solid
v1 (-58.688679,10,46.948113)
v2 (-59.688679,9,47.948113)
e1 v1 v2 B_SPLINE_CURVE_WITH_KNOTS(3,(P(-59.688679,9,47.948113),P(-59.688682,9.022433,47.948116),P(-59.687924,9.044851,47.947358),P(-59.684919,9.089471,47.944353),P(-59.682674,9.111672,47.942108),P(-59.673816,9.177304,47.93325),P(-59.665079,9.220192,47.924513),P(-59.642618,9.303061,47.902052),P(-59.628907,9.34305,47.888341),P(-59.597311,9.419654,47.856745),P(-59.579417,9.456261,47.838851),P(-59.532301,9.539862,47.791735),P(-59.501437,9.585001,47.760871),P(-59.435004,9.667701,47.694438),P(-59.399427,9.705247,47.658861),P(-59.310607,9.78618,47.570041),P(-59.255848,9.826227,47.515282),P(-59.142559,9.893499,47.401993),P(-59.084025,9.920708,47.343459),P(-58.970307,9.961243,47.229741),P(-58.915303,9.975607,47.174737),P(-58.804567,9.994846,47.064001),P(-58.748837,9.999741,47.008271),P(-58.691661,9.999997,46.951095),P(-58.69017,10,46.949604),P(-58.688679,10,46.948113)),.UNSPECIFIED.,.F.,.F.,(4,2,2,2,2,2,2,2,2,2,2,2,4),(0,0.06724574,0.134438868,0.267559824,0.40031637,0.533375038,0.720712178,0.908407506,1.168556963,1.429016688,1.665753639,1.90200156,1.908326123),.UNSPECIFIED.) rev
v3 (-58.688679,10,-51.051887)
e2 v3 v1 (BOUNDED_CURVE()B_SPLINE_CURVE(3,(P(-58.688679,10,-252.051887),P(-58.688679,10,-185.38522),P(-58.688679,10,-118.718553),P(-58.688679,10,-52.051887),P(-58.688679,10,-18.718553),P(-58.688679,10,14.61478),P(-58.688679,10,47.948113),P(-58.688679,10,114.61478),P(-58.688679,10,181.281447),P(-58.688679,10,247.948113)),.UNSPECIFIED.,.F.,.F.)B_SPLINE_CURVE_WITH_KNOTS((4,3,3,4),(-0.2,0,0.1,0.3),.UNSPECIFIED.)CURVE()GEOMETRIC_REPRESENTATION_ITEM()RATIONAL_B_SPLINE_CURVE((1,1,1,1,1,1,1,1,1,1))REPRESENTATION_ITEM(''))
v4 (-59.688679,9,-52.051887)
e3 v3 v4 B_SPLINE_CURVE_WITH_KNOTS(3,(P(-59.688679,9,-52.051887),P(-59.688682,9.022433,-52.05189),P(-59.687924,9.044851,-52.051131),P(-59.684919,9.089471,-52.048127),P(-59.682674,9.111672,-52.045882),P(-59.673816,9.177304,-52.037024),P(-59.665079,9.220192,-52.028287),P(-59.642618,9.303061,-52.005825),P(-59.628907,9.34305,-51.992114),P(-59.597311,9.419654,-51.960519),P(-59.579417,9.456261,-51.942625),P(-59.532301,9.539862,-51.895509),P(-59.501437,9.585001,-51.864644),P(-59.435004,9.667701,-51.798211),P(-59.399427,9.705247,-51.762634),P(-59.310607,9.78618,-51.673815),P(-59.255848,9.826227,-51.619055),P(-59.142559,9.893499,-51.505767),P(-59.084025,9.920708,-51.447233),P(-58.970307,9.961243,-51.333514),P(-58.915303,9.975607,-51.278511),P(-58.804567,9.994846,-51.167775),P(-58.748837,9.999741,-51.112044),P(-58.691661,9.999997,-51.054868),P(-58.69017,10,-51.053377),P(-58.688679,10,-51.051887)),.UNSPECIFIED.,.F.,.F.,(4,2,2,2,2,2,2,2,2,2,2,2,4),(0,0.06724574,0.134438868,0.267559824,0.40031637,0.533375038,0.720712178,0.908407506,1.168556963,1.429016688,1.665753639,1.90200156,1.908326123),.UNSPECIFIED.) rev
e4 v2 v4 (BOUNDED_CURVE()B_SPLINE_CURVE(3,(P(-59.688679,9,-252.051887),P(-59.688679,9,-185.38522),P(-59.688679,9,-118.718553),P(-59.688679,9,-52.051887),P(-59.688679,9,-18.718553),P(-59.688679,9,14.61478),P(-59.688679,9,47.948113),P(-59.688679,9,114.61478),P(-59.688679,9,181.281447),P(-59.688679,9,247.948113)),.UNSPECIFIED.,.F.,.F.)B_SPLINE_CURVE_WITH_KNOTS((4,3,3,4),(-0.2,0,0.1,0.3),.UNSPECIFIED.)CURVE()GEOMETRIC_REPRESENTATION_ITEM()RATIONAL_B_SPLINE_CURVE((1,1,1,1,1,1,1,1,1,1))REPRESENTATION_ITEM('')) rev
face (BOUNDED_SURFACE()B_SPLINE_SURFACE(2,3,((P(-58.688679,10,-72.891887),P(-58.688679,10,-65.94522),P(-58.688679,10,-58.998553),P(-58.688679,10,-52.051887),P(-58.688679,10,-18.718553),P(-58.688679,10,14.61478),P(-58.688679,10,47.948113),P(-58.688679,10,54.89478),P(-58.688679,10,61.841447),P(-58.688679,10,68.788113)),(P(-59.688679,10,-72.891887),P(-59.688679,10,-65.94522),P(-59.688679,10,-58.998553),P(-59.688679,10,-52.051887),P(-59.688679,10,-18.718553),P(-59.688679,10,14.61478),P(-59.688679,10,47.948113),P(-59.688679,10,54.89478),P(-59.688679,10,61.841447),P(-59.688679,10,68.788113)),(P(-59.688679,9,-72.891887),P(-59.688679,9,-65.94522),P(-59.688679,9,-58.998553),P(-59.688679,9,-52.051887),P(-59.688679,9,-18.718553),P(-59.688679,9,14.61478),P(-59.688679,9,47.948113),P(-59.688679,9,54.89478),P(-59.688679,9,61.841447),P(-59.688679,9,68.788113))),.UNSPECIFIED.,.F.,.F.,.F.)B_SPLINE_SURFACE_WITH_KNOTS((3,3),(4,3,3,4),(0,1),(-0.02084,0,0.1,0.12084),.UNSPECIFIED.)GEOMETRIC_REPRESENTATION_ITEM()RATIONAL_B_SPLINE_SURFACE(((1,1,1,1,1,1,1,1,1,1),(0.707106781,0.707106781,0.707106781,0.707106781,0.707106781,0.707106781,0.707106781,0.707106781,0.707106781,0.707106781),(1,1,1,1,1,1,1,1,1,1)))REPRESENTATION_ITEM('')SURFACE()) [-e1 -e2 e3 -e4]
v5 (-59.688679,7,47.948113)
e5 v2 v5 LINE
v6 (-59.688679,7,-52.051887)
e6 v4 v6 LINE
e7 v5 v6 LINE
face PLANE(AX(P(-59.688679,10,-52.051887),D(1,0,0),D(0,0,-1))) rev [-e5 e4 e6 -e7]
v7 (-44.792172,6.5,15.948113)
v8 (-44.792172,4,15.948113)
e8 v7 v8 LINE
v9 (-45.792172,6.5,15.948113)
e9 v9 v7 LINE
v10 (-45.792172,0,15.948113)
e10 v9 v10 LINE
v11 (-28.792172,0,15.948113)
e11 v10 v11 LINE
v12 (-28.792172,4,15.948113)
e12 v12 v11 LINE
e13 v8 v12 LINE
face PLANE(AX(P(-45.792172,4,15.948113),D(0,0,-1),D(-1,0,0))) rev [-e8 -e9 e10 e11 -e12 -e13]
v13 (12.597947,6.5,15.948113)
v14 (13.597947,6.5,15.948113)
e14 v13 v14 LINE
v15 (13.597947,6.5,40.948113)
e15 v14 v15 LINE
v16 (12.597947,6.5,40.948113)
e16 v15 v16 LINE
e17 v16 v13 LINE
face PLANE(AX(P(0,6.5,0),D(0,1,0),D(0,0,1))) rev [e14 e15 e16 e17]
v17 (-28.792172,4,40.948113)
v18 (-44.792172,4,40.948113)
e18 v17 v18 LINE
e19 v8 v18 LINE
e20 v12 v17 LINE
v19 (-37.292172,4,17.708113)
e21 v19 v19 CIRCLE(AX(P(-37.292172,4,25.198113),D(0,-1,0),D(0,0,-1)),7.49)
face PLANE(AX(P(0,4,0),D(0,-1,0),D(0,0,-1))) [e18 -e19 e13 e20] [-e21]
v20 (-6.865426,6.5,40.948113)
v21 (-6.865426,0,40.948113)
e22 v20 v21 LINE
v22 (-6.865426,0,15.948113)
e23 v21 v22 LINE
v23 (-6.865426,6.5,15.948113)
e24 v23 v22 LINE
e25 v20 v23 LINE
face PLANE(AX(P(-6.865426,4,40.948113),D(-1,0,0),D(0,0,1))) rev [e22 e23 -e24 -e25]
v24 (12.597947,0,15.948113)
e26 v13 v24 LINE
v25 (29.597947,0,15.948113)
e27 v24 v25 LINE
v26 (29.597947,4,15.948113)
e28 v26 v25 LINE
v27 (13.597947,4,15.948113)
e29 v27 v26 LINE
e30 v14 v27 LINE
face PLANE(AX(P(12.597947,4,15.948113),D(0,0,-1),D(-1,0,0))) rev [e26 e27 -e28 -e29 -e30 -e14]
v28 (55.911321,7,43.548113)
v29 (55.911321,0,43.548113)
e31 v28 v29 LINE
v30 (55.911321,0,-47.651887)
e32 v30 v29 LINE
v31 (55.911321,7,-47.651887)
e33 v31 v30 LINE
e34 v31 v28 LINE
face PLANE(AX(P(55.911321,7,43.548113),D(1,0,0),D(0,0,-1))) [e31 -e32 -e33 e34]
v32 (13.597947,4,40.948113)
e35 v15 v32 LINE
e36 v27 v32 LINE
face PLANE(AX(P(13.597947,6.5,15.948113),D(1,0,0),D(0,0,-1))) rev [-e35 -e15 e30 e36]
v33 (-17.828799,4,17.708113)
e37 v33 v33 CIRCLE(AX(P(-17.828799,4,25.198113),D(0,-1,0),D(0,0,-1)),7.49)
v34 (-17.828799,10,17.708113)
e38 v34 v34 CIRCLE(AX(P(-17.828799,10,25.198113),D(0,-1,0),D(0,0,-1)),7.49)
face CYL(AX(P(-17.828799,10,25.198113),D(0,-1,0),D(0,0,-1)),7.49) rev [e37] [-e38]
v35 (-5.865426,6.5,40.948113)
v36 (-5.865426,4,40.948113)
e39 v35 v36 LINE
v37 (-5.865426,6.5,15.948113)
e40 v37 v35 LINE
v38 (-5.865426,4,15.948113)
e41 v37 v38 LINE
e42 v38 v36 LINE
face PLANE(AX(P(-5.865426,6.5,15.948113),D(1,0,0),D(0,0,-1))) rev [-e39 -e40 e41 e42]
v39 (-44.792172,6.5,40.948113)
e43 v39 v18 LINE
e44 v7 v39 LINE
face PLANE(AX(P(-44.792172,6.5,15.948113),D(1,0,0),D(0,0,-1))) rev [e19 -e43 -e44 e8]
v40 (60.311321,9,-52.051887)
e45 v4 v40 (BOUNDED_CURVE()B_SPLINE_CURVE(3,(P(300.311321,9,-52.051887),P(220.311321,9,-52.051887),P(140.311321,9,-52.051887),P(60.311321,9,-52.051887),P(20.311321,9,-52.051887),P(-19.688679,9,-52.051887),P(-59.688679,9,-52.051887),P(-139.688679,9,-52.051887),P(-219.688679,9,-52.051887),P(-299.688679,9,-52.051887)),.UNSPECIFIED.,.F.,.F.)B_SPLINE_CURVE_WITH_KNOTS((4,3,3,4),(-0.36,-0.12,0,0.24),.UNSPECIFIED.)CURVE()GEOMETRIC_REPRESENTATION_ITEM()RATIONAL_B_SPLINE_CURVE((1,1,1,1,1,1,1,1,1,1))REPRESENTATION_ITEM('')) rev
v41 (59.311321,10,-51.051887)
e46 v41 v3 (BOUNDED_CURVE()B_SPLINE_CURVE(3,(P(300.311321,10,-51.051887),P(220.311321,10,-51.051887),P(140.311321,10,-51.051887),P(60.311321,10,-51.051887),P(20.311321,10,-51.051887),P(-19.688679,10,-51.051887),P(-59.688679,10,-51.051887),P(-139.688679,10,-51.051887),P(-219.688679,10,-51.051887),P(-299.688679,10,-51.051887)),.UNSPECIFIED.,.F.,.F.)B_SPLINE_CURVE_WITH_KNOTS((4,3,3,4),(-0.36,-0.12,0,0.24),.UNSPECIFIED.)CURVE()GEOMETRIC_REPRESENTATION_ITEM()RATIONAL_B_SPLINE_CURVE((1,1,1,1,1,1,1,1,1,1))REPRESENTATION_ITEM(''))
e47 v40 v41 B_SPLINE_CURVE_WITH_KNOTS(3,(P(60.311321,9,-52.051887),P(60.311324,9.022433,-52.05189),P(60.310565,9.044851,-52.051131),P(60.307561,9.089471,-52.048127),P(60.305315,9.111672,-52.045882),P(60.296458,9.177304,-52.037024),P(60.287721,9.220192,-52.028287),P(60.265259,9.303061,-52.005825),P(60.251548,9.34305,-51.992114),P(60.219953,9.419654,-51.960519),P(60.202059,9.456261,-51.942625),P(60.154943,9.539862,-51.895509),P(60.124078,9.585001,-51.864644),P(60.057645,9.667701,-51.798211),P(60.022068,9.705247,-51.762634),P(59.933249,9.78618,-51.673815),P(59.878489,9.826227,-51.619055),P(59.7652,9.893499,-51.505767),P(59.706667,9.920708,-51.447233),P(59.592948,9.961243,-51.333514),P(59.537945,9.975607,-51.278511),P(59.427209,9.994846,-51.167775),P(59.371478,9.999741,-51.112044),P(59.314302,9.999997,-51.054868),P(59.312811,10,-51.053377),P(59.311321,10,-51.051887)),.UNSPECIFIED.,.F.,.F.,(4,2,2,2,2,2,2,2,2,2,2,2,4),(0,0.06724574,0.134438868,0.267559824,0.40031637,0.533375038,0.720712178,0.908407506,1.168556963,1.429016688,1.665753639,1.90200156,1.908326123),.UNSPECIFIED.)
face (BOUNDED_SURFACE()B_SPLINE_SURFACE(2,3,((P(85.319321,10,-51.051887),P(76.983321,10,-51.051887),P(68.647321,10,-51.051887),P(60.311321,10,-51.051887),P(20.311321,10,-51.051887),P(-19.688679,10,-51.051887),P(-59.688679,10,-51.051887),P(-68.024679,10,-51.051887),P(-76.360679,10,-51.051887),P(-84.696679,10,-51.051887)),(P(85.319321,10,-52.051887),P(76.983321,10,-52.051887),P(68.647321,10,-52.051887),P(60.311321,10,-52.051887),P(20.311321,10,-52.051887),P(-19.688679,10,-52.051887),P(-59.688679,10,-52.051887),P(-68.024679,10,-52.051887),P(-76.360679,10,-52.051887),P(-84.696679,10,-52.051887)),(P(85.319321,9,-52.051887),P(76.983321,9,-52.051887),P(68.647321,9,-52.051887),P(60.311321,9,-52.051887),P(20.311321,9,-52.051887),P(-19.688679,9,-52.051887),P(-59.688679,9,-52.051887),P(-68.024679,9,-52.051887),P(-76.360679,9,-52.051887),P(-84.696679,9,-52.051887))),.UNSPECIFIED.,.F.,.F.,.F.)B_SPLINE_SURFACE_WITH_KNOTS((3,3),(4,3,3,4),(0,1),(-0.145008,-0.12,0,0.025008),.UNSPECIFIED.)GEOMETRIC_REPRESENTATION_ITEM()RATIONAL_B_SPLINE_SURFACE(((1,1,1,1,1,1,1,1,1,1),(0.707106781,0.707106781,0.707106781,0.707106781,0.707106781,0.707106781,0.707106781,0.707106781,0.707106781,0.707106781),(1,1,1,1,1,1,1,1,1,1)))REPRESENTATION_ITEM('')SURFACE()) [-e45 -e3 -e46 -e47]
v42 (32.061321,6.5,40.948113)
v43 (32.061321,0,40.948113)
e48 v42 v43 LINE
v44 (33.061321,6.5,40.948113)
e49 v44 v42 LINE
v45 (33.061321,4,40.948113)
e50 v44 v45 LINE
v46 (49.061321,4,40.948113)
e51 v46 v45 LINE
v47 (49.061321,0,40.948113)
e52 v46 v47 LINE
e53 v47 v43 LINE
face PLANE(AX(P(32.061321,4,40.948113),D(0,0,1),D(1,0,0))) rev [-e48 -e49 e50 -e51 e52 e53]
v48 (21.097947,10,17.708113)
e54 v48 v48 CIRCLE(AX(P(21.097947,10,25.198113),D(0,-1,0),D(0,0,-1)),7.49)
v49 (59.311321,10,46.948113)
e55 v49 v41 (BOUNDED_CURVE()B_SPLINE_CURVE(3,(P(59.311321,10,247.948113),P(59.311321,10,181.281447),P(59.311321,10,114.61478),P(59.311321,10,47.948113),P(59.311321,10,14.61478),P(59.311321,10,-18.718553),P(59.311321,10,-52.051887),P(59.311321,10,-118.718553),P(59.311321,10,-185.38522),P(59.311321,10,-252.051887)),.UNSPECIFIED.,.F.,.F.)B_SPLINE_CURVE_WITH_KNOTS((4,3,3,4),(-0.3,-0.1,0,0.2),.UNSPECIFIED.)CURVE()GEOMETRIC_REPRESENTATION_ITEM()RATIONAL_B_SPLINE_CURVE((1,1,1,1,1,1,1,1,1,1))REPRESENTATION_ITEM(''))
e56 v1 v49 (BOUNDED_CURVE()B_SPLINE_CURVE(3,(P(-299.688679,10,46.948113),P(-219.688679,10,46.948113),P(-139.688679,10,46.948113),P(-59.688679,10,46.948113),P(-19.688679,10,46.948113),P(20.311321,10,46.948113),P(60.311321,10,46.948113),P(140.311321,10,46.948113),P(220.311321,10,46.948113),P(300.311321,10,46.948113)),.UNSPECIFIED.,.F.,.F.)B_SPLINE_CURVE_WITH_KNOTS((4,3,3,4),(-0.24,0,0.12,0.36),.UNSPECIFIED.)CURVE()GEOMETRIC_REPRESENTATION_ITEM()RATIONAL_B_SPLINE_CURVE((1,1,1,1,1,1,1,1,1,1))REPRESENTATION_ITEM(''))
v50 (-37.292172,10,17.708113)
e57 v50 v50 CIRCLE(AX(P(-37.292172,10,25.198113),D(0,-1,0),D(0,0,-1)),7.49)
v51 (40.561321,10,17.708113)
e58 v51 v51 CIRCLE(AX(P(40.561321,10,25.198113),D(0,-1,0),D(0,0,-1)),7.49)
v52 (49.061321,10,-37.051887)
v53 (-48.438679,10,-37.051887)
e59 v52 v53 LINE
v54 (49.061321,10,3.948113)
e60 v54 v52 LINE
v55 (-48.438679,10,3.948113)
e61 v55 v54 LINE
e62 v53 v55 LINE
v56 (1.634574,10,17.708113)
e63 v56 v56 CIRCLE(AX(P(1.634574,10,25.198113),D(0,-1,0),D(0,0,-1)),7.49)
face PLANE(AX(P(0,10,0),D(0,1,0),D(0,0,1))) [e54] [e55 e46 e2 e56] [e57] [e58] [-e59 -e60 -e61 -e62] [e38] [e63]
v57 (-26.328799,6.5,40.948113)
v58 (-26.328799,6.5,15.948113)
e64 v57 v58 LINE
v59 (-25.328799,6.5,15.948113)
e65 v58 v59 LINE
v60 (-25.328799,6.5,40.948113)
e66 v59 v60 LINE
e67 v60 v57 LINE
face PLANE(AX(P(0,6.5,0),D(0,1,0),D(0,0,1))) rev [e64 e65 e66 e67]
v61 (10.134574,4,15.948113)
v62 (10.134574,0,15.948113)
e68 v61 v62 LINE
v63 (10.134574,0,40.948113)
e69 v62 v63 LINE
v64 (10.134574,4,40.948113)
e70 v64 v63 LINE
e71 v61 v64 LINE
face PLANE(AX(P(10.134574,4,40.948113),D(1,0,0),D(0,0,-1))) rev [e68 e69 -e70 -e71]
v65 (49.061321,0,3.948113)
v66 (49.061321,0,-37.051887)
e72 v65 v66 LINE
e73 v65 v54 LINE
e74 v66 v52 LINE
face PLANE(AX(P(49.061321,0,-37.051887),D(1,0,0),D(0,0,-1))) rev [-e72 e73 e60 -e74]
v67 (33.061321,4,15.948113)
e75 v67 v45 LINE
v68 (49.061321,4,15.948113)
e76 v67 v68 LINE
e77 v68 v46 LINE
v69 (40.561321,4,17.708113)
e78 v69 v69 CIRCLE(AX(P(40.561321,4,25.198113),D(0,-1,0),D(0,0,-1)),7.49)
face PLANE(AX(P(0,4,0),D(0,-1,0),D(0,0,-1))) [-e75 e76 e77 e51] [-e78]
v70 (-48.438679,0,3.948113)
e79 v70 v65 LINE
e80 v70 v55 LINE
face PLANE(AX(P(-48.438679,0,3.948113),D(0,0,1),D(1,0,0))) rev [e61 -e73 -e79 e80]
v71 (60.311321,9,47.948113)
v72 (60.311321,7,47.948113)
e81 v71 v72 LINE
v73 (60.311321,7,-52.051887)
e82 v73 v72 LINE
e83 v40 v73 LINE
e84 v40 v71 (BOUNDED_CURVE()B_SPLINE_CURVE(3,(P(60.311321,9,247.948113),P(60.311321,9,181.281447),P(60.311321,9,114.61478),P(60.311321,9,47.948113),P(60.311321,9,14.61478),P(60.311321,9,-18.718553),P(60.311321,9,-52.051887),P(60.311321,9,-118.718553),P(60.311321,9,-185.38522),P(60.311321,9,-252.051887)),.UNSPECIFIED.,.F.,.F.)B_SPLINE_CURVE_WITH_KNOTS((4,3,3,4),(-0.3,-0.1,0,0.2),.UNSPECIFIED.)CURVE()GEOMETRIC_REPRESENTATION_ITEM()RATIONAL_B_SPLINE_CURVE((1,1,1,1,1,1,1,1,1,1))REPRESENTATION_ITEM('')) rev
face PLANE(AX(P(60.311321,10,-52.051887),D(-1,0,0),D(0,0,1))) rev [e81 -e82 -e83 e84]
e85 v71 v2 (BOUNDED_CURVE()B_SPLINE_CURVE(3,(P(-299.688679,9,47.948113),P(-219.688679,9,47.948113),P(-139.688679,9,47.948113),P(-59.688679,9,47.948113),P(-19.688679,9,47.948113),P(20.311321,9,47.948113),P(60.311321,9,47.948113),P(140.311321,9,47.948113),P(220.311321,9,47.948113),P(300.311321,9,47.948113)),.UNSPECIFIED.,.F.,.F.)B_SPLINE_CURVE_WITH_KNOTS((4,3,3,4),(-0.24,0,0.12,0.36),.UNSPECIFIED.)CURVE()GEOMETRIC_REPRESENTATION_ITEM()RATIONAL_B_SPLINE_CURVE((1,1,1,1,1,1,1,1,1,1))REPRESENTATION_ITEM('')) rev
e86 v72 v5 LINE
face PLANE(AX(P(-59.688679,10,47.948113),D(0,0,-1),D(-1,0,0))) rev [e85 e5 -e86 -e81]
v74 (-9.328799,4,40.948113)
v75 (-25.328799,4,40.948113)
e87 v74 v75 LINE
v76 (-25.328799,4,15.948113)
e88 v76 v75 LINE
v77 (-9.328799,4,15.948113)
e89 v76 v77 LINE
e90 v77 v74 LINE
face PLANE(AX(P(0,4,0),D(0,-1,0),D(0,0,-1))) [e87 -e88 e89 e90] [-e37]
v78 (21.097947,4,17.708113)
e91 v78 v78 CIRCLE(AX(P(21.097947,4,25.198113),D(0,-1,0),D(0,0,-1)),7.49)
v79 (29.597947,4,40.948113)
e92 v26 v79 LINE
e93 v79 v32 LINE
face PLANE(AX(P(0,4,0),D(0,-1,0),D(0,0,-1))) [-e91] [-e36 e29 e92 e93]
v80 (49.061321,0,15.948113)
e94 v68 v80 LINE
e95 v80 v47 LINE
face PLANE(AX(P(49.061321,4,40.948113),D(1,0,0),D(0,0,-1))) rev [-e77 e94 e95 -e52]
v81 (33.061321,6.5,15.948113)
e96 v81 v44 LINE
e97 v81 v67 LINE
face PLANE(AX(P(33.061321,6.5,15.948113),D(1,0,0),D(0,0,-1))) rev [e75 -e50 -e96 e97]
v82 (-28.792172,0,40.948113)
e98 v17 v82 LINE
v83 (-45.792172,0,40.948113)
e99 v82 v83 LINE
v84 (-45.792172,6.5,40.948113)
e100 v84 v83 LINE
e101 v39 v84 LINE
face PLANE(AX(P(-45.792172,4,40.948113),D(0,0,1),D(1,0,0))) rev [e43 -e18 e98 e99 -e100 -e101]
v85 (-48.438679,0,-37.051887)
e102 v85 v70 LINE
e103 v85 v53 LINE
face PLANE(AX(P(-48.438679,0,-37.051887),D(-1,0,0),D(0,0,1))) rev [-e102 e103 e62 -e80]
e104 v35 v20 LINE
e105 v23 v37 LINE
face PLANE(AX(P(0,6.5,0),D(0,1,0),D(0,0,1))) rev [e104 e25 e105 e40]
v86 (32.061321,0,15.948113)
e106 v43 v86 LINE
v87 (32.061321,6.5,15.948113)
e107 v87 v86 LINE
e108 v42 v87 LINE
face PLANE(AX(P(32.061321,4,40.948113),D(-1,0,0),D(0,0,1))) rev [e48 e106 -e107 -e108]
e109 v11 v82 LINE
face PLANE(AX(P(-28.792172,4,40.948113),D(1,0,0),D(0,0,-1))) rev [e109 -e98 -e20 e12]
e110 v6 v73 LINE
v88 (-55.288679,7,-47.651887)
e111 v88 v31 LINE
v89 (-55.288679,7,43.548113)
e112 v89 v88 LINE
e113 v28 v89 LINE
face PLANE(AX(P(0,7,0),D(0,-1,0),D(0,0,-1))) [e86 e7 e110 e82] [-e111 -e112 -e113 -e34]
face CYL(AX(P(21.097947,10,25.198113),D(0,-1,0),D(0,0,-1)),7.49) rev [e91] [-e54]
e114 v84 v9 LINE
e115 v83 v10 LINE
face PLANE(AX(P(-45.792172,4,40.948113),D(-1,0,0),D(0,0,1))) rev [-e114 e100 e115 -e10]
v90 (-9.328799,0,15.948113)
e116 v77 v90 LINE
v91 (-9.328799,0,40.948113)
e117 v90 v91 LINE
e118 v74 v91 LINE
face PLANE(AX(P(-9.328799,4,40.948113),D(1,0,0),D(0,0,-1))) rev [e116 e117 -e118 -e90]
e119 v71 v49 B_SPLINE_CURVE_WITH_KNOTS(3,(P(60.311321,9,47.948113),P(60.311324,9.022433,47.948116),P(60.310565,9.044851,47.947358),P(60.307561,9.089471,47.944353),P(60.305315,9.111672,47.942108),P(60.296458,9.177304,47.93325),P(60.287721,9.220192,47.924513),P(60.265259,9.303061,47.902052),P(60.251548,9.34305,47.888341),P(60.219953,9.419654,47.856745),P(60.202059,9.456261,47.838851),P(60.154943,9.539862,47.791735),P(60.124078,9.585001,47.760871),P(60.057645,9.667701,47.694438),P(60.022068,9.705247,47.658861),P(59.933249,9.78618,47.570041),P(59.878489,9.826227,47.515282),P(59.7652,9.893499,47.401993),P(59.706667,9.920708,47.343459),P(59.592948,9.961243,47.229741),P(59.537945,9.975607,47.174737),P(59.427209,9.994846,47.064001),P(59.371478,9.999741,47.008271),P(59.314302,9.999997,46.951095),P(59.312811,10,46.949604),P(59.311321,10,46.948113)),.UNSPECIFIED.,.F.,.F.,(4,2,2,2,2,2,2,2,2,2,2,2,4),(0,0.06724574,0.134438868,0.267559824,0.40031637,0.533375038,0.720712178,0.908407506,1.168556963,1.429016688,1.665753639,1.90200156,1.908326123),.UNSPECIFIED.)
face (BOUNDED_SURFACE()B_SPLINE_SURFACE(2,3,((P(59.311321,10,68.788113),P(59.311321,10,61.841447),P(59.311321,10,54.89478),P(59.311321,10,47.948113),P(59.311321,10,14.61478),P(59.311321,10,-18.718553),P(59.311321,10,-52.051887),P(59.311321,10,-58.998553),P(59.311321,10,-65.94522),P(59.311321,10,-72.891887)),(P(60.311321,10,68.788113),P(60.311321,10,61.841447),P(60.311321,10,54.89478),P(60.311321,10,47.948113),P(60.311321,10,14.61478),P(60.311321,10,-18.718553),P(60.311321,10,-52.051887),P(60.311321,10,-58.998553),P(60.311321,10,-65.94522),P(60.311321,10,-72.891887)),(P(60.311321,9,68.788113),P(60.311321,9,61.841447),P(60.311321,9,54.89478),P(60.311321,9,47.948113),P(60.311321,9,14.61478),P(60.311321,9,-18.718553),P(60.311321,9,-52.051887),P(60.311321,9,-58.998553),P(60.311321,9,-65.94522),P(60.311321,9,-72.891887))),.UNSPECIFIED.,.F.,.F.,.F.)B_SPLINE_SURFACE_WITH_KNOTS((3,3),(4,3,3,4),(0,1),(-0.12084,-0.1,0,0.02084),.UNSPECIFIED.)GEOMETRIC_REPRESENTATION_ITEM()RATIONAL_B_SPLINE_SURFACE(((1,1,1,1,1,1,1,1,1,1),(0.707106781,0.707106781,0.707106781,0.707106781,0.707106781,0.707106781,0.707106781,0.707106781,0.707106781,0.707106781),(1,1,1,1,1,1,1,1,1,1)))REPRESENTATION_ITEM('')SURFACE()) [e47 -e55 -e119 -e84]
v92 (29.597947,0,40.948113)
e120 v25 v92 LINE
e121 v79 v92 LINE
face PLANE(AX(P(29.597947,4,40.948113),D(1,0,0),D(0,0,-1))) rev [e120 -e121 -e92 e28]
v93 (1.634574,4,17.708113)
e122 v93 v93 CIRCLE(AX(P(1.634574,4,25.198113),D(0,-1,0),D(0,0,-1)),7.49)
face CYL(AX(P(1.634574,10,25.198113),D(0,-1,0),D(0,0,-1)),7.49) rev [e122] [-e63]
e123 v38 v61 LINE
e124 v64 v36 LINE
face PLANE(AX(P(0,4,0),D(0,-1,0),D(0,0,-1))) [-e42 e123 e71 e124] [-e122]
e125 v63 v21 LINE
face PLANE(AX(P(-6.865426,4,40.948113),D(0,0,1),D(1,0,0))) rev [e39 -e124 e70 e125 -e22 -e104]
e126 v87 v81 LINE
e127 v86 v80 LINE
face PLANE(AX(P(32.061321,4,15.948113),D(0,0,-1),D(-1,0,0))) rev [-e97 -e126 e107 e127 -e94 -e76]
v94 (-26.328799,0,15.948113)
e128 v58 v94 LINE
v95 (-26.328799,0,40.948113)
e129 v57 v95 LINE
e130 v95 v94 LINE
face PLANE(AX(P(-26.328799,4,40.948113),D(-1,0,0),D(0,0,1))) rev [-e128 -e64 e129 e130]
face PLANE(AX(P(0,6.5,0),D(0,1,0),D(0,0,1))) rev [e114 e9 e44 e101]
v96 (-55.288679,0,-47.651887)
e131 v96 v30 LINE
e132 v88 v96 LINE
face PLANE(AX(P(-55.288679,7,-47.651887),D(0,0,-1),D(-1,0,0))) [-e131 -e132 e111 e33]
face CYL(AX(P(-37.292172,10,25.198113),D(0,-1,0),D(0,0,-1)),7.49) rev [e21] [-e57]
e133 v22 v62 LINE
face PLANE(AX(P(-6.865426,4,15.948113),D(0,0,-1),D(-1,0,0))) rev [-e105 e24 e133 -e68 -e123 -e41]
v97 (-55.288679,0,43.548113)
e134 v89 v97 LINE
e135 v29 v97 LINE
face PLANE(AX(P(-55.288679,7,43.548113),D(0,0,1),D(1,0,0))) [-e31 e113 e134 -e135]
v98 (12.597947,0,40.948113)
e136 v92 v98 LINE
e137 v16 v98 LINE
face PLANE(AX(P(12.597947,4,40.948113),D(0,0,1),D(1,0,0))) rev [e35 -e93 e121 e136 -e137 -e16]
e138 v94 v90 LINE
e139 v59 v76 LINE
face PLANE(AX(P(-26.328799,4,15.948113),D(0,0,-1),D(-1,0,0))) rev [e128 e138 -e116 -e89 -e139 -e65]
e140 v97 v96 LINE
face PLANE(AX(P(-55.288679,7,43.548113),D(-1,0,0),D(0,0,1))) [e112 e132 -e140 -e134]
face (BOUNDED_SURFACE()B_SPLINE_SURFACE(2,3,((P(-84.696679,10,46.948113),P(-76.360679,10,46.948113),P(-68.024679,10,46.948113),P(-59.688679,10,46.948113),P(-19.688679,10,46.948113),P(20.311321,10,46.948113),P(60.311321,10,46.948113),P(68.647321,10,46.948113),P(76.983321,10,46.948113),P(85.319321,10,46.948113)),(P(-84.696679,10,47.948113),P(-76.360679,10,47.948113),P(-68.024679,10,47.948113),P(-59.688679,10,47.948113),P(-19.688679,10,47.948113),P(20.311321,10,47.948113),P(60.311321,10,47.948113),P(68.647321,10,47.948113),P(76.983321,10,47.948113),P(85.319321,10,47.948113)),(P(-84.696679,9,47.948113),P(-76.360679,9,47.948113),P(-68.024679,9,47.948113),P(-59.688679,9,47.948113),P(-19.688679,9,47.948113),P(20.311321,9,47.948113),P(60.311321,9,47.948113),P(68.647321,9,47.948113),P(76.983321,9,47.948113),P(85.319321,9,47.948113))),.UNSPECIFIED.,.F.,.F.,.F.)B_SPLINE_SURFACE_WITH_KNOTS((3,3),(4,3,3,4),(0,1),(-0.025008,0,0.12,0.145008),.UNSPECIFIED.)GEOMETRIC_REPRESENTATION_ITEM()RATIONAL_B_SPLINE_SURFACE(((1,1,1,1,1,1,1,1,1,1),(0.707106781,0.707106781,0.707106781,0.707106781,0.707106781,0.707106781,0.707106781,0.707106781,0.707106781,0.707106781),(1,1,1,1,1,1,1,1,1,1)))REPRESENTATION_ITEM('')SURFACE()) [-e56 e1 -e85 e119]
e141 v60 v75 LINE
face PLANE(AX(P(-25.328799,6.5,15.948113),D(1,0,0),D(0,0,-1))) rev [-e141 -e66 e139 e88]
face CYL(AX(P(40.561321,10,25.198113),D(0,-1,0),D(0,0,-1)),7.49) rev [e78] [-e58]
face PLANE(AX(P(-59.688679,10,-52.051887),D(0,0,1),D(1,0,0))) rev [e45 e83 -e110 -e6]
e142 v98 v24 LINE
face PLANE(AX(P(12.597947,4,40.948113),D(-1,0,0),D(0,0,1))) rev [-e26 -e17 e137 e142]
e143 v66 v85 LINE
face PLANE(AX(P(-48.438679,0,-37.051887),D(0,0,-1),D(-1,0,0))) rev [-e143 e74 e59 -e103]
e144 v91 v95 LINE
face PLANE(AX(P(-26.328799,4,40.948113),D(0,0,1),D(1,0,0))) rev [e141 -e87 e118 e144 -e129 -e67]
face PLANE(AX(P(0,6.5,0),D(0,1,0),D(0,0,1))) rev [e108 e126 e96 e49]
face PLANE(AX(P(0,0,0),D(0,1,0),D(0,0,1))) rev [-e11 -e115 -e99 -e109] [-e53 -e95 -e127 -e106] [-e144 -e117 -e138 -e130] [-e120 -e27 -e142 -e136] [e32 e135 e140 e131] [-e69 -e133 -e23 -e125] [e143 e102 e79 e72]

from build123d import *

# Parameters (mm, degrees)
SKETCH1_W           = 120
SKETCH1_H           = 100
BOSS_EXTRUDE1_DEPTH = 10
SKETCH2_W           = 97.5
SKETCH2_H           = 41
CUT_EXTRUDE1_DEPTH  = 10
SKETCH3_W           = 120
SKETCH3_H           = 100
SKETCH3_W_2         = 111.2
SKETCH3_H_2         = 91.2
CUT_EXTRUDE3_DEPTH  = 7
SKETCH4_W           = 17
SKETCH4_H           = 25
CUT_EXTRUDE4_DEPTH  = 4
SKETCH5_W           = 1
SKETCH5_H           = 25
CUT_EXTRUDE6_DEPTH  = 2.5
SKETCH6_R           = 7.49
CUT_EXTRUDE12_DEPTH = 80.892767694
VARFILLET1_R        = 1


with BuildPart() as part:
    # Sketch1 → Boss-Extrude1 (new body)
    with BuildSketch(Plane(origin=(0, 0, 0), x_dir=(1, 0, 0), z_dir=(0, 1, 0))):
        with Locations((0.311320755, 2.051886792)):
            Rectangle(SKETCH1_W, SKETCH1_H)
    extrude(amount=BOSS_EXTRUDE1_DEPTH)

    # Sketch2 → Cut-Extrude1 (cut)
    with BuildSketch(Plane(origin=(0, 10, 0), x_dir=(1, 0, 0), z_dir=(0, 1, 0))):
        with Locations((0.311320755, 16.551886792)):
            Rectangle(SKETCH2_W, SKETCH2_H)
    extrude(amount=-CUT_EXTRUDE1_DEPTH, mode=Mode.SUBTRACT)

    # Sketch3 → Cut-Extrude3 (cut)
    with BuildSketch(Plane.XZ):
        with Locations((0.311320755, -2.051886792)):
            Rectangle(SKETCH3_W, SKETCH3_H)
        with Locations((0.311320755, -2.051886792)):
            Rectangle(SKETCH3_W_2, SKETCH3_H_2, mode=Mode.SUBTRACT)
    extrude(amount=-CUT_EXTRUDE3_DEPTH, mode=Mode.SUBTRACT)

    # Sketch4 → Cut-Extrude4 (cut)
    with BuildSketch(Plane.XZ):
        with Locations((-37.292172289, 28.448113208)):
            Rectangle(SKETCH4_W, SKETCH4_H)
        with Locations((-17.828799028, 28.448113208)):
            Rectangle(SKETCH4_W, SKETCH4_H)
        with Locations((1.634574233, 28.448113208)):
            Rectangle(SKETCH4_W, SKETCH4_H)
        with Locations((21.097947494, 28.448113208)):
            Rectangle(SKETCH4_W, SKETCH4_H)
        with Locations((40.561320755, 28.448113208)):
            Rectangle(SKETCH4_W, SKETCH4_H)
    extrude(amount=-CUT_EXTRUDE4_DEPTH, mode=Mode.SUBTRACT)

    # Sketch5 → Cut-Extrude6 (cut)
    with BuildSketch(Plane.XZ.offset(-4)):
        with Locations((32.561320755, 28.448113208)):
            Rectangle(SKETCH5_W, SKETCH5_H)
        with Locations((13.097947494, 28.448113208)):
            Rectangle(SKETCH5_W, SKETCH5_H)
        with Locations((-6.365425767, 28.448113208)):
            Rectangle(SKETCH5_W, SKETCH5_H)
        with Locations((-25.828799028, 28.448113208)):
            Rectangle(SKETCH5_W, SKETCH5_H)
        with Locations((-45.292172289, 28.448113208)):
            Rectangle(SKETCH5_W, SKETCH5_H)
    extrude(amount=-CUT_EXTRUDE6_DEPTH, mode=Mode.SUBTRACT)

    # Sketch6 → Cut-Extrude12 (cut, through all)
    with BuildSketch(Plane.XZ.offset(-4)):
        with Locations((40.561320755, 25.198113208)):
            Circle(SKETCH6_R)
        with Locations((21.097947494, 25.198113208)):
            Circle(SKETCH6_R)
        with Locations((1.634574233, 25.198113208)):
            Circle(SKETCH6_R)
        with Locations((-17.828799028, 25.198113208)):
            Circle(SKETCH6_R)
        with Locations((-37.292172289, 25.198113208)):
            Circle(SKETCH6_R)
    extrude(amount=-CUT_EXTRUDE12_DEPTH, mode=Mode.SUBTRACT)

    # VarFillet1
    varfillet1_edges = [part.edges().sort_by_distance(p)[0] for p in [
        (0.311320755, 10, 47.948113208),
        (60.311320755, 10, -2.051886792),
        (0.311320755, 10, -52.051886792),
        (-59.688679245, 10, -2.051886792),
    ]]
    fillet(varfillet1_edges, radius=VARFILLET1_R)


solid = part.part
